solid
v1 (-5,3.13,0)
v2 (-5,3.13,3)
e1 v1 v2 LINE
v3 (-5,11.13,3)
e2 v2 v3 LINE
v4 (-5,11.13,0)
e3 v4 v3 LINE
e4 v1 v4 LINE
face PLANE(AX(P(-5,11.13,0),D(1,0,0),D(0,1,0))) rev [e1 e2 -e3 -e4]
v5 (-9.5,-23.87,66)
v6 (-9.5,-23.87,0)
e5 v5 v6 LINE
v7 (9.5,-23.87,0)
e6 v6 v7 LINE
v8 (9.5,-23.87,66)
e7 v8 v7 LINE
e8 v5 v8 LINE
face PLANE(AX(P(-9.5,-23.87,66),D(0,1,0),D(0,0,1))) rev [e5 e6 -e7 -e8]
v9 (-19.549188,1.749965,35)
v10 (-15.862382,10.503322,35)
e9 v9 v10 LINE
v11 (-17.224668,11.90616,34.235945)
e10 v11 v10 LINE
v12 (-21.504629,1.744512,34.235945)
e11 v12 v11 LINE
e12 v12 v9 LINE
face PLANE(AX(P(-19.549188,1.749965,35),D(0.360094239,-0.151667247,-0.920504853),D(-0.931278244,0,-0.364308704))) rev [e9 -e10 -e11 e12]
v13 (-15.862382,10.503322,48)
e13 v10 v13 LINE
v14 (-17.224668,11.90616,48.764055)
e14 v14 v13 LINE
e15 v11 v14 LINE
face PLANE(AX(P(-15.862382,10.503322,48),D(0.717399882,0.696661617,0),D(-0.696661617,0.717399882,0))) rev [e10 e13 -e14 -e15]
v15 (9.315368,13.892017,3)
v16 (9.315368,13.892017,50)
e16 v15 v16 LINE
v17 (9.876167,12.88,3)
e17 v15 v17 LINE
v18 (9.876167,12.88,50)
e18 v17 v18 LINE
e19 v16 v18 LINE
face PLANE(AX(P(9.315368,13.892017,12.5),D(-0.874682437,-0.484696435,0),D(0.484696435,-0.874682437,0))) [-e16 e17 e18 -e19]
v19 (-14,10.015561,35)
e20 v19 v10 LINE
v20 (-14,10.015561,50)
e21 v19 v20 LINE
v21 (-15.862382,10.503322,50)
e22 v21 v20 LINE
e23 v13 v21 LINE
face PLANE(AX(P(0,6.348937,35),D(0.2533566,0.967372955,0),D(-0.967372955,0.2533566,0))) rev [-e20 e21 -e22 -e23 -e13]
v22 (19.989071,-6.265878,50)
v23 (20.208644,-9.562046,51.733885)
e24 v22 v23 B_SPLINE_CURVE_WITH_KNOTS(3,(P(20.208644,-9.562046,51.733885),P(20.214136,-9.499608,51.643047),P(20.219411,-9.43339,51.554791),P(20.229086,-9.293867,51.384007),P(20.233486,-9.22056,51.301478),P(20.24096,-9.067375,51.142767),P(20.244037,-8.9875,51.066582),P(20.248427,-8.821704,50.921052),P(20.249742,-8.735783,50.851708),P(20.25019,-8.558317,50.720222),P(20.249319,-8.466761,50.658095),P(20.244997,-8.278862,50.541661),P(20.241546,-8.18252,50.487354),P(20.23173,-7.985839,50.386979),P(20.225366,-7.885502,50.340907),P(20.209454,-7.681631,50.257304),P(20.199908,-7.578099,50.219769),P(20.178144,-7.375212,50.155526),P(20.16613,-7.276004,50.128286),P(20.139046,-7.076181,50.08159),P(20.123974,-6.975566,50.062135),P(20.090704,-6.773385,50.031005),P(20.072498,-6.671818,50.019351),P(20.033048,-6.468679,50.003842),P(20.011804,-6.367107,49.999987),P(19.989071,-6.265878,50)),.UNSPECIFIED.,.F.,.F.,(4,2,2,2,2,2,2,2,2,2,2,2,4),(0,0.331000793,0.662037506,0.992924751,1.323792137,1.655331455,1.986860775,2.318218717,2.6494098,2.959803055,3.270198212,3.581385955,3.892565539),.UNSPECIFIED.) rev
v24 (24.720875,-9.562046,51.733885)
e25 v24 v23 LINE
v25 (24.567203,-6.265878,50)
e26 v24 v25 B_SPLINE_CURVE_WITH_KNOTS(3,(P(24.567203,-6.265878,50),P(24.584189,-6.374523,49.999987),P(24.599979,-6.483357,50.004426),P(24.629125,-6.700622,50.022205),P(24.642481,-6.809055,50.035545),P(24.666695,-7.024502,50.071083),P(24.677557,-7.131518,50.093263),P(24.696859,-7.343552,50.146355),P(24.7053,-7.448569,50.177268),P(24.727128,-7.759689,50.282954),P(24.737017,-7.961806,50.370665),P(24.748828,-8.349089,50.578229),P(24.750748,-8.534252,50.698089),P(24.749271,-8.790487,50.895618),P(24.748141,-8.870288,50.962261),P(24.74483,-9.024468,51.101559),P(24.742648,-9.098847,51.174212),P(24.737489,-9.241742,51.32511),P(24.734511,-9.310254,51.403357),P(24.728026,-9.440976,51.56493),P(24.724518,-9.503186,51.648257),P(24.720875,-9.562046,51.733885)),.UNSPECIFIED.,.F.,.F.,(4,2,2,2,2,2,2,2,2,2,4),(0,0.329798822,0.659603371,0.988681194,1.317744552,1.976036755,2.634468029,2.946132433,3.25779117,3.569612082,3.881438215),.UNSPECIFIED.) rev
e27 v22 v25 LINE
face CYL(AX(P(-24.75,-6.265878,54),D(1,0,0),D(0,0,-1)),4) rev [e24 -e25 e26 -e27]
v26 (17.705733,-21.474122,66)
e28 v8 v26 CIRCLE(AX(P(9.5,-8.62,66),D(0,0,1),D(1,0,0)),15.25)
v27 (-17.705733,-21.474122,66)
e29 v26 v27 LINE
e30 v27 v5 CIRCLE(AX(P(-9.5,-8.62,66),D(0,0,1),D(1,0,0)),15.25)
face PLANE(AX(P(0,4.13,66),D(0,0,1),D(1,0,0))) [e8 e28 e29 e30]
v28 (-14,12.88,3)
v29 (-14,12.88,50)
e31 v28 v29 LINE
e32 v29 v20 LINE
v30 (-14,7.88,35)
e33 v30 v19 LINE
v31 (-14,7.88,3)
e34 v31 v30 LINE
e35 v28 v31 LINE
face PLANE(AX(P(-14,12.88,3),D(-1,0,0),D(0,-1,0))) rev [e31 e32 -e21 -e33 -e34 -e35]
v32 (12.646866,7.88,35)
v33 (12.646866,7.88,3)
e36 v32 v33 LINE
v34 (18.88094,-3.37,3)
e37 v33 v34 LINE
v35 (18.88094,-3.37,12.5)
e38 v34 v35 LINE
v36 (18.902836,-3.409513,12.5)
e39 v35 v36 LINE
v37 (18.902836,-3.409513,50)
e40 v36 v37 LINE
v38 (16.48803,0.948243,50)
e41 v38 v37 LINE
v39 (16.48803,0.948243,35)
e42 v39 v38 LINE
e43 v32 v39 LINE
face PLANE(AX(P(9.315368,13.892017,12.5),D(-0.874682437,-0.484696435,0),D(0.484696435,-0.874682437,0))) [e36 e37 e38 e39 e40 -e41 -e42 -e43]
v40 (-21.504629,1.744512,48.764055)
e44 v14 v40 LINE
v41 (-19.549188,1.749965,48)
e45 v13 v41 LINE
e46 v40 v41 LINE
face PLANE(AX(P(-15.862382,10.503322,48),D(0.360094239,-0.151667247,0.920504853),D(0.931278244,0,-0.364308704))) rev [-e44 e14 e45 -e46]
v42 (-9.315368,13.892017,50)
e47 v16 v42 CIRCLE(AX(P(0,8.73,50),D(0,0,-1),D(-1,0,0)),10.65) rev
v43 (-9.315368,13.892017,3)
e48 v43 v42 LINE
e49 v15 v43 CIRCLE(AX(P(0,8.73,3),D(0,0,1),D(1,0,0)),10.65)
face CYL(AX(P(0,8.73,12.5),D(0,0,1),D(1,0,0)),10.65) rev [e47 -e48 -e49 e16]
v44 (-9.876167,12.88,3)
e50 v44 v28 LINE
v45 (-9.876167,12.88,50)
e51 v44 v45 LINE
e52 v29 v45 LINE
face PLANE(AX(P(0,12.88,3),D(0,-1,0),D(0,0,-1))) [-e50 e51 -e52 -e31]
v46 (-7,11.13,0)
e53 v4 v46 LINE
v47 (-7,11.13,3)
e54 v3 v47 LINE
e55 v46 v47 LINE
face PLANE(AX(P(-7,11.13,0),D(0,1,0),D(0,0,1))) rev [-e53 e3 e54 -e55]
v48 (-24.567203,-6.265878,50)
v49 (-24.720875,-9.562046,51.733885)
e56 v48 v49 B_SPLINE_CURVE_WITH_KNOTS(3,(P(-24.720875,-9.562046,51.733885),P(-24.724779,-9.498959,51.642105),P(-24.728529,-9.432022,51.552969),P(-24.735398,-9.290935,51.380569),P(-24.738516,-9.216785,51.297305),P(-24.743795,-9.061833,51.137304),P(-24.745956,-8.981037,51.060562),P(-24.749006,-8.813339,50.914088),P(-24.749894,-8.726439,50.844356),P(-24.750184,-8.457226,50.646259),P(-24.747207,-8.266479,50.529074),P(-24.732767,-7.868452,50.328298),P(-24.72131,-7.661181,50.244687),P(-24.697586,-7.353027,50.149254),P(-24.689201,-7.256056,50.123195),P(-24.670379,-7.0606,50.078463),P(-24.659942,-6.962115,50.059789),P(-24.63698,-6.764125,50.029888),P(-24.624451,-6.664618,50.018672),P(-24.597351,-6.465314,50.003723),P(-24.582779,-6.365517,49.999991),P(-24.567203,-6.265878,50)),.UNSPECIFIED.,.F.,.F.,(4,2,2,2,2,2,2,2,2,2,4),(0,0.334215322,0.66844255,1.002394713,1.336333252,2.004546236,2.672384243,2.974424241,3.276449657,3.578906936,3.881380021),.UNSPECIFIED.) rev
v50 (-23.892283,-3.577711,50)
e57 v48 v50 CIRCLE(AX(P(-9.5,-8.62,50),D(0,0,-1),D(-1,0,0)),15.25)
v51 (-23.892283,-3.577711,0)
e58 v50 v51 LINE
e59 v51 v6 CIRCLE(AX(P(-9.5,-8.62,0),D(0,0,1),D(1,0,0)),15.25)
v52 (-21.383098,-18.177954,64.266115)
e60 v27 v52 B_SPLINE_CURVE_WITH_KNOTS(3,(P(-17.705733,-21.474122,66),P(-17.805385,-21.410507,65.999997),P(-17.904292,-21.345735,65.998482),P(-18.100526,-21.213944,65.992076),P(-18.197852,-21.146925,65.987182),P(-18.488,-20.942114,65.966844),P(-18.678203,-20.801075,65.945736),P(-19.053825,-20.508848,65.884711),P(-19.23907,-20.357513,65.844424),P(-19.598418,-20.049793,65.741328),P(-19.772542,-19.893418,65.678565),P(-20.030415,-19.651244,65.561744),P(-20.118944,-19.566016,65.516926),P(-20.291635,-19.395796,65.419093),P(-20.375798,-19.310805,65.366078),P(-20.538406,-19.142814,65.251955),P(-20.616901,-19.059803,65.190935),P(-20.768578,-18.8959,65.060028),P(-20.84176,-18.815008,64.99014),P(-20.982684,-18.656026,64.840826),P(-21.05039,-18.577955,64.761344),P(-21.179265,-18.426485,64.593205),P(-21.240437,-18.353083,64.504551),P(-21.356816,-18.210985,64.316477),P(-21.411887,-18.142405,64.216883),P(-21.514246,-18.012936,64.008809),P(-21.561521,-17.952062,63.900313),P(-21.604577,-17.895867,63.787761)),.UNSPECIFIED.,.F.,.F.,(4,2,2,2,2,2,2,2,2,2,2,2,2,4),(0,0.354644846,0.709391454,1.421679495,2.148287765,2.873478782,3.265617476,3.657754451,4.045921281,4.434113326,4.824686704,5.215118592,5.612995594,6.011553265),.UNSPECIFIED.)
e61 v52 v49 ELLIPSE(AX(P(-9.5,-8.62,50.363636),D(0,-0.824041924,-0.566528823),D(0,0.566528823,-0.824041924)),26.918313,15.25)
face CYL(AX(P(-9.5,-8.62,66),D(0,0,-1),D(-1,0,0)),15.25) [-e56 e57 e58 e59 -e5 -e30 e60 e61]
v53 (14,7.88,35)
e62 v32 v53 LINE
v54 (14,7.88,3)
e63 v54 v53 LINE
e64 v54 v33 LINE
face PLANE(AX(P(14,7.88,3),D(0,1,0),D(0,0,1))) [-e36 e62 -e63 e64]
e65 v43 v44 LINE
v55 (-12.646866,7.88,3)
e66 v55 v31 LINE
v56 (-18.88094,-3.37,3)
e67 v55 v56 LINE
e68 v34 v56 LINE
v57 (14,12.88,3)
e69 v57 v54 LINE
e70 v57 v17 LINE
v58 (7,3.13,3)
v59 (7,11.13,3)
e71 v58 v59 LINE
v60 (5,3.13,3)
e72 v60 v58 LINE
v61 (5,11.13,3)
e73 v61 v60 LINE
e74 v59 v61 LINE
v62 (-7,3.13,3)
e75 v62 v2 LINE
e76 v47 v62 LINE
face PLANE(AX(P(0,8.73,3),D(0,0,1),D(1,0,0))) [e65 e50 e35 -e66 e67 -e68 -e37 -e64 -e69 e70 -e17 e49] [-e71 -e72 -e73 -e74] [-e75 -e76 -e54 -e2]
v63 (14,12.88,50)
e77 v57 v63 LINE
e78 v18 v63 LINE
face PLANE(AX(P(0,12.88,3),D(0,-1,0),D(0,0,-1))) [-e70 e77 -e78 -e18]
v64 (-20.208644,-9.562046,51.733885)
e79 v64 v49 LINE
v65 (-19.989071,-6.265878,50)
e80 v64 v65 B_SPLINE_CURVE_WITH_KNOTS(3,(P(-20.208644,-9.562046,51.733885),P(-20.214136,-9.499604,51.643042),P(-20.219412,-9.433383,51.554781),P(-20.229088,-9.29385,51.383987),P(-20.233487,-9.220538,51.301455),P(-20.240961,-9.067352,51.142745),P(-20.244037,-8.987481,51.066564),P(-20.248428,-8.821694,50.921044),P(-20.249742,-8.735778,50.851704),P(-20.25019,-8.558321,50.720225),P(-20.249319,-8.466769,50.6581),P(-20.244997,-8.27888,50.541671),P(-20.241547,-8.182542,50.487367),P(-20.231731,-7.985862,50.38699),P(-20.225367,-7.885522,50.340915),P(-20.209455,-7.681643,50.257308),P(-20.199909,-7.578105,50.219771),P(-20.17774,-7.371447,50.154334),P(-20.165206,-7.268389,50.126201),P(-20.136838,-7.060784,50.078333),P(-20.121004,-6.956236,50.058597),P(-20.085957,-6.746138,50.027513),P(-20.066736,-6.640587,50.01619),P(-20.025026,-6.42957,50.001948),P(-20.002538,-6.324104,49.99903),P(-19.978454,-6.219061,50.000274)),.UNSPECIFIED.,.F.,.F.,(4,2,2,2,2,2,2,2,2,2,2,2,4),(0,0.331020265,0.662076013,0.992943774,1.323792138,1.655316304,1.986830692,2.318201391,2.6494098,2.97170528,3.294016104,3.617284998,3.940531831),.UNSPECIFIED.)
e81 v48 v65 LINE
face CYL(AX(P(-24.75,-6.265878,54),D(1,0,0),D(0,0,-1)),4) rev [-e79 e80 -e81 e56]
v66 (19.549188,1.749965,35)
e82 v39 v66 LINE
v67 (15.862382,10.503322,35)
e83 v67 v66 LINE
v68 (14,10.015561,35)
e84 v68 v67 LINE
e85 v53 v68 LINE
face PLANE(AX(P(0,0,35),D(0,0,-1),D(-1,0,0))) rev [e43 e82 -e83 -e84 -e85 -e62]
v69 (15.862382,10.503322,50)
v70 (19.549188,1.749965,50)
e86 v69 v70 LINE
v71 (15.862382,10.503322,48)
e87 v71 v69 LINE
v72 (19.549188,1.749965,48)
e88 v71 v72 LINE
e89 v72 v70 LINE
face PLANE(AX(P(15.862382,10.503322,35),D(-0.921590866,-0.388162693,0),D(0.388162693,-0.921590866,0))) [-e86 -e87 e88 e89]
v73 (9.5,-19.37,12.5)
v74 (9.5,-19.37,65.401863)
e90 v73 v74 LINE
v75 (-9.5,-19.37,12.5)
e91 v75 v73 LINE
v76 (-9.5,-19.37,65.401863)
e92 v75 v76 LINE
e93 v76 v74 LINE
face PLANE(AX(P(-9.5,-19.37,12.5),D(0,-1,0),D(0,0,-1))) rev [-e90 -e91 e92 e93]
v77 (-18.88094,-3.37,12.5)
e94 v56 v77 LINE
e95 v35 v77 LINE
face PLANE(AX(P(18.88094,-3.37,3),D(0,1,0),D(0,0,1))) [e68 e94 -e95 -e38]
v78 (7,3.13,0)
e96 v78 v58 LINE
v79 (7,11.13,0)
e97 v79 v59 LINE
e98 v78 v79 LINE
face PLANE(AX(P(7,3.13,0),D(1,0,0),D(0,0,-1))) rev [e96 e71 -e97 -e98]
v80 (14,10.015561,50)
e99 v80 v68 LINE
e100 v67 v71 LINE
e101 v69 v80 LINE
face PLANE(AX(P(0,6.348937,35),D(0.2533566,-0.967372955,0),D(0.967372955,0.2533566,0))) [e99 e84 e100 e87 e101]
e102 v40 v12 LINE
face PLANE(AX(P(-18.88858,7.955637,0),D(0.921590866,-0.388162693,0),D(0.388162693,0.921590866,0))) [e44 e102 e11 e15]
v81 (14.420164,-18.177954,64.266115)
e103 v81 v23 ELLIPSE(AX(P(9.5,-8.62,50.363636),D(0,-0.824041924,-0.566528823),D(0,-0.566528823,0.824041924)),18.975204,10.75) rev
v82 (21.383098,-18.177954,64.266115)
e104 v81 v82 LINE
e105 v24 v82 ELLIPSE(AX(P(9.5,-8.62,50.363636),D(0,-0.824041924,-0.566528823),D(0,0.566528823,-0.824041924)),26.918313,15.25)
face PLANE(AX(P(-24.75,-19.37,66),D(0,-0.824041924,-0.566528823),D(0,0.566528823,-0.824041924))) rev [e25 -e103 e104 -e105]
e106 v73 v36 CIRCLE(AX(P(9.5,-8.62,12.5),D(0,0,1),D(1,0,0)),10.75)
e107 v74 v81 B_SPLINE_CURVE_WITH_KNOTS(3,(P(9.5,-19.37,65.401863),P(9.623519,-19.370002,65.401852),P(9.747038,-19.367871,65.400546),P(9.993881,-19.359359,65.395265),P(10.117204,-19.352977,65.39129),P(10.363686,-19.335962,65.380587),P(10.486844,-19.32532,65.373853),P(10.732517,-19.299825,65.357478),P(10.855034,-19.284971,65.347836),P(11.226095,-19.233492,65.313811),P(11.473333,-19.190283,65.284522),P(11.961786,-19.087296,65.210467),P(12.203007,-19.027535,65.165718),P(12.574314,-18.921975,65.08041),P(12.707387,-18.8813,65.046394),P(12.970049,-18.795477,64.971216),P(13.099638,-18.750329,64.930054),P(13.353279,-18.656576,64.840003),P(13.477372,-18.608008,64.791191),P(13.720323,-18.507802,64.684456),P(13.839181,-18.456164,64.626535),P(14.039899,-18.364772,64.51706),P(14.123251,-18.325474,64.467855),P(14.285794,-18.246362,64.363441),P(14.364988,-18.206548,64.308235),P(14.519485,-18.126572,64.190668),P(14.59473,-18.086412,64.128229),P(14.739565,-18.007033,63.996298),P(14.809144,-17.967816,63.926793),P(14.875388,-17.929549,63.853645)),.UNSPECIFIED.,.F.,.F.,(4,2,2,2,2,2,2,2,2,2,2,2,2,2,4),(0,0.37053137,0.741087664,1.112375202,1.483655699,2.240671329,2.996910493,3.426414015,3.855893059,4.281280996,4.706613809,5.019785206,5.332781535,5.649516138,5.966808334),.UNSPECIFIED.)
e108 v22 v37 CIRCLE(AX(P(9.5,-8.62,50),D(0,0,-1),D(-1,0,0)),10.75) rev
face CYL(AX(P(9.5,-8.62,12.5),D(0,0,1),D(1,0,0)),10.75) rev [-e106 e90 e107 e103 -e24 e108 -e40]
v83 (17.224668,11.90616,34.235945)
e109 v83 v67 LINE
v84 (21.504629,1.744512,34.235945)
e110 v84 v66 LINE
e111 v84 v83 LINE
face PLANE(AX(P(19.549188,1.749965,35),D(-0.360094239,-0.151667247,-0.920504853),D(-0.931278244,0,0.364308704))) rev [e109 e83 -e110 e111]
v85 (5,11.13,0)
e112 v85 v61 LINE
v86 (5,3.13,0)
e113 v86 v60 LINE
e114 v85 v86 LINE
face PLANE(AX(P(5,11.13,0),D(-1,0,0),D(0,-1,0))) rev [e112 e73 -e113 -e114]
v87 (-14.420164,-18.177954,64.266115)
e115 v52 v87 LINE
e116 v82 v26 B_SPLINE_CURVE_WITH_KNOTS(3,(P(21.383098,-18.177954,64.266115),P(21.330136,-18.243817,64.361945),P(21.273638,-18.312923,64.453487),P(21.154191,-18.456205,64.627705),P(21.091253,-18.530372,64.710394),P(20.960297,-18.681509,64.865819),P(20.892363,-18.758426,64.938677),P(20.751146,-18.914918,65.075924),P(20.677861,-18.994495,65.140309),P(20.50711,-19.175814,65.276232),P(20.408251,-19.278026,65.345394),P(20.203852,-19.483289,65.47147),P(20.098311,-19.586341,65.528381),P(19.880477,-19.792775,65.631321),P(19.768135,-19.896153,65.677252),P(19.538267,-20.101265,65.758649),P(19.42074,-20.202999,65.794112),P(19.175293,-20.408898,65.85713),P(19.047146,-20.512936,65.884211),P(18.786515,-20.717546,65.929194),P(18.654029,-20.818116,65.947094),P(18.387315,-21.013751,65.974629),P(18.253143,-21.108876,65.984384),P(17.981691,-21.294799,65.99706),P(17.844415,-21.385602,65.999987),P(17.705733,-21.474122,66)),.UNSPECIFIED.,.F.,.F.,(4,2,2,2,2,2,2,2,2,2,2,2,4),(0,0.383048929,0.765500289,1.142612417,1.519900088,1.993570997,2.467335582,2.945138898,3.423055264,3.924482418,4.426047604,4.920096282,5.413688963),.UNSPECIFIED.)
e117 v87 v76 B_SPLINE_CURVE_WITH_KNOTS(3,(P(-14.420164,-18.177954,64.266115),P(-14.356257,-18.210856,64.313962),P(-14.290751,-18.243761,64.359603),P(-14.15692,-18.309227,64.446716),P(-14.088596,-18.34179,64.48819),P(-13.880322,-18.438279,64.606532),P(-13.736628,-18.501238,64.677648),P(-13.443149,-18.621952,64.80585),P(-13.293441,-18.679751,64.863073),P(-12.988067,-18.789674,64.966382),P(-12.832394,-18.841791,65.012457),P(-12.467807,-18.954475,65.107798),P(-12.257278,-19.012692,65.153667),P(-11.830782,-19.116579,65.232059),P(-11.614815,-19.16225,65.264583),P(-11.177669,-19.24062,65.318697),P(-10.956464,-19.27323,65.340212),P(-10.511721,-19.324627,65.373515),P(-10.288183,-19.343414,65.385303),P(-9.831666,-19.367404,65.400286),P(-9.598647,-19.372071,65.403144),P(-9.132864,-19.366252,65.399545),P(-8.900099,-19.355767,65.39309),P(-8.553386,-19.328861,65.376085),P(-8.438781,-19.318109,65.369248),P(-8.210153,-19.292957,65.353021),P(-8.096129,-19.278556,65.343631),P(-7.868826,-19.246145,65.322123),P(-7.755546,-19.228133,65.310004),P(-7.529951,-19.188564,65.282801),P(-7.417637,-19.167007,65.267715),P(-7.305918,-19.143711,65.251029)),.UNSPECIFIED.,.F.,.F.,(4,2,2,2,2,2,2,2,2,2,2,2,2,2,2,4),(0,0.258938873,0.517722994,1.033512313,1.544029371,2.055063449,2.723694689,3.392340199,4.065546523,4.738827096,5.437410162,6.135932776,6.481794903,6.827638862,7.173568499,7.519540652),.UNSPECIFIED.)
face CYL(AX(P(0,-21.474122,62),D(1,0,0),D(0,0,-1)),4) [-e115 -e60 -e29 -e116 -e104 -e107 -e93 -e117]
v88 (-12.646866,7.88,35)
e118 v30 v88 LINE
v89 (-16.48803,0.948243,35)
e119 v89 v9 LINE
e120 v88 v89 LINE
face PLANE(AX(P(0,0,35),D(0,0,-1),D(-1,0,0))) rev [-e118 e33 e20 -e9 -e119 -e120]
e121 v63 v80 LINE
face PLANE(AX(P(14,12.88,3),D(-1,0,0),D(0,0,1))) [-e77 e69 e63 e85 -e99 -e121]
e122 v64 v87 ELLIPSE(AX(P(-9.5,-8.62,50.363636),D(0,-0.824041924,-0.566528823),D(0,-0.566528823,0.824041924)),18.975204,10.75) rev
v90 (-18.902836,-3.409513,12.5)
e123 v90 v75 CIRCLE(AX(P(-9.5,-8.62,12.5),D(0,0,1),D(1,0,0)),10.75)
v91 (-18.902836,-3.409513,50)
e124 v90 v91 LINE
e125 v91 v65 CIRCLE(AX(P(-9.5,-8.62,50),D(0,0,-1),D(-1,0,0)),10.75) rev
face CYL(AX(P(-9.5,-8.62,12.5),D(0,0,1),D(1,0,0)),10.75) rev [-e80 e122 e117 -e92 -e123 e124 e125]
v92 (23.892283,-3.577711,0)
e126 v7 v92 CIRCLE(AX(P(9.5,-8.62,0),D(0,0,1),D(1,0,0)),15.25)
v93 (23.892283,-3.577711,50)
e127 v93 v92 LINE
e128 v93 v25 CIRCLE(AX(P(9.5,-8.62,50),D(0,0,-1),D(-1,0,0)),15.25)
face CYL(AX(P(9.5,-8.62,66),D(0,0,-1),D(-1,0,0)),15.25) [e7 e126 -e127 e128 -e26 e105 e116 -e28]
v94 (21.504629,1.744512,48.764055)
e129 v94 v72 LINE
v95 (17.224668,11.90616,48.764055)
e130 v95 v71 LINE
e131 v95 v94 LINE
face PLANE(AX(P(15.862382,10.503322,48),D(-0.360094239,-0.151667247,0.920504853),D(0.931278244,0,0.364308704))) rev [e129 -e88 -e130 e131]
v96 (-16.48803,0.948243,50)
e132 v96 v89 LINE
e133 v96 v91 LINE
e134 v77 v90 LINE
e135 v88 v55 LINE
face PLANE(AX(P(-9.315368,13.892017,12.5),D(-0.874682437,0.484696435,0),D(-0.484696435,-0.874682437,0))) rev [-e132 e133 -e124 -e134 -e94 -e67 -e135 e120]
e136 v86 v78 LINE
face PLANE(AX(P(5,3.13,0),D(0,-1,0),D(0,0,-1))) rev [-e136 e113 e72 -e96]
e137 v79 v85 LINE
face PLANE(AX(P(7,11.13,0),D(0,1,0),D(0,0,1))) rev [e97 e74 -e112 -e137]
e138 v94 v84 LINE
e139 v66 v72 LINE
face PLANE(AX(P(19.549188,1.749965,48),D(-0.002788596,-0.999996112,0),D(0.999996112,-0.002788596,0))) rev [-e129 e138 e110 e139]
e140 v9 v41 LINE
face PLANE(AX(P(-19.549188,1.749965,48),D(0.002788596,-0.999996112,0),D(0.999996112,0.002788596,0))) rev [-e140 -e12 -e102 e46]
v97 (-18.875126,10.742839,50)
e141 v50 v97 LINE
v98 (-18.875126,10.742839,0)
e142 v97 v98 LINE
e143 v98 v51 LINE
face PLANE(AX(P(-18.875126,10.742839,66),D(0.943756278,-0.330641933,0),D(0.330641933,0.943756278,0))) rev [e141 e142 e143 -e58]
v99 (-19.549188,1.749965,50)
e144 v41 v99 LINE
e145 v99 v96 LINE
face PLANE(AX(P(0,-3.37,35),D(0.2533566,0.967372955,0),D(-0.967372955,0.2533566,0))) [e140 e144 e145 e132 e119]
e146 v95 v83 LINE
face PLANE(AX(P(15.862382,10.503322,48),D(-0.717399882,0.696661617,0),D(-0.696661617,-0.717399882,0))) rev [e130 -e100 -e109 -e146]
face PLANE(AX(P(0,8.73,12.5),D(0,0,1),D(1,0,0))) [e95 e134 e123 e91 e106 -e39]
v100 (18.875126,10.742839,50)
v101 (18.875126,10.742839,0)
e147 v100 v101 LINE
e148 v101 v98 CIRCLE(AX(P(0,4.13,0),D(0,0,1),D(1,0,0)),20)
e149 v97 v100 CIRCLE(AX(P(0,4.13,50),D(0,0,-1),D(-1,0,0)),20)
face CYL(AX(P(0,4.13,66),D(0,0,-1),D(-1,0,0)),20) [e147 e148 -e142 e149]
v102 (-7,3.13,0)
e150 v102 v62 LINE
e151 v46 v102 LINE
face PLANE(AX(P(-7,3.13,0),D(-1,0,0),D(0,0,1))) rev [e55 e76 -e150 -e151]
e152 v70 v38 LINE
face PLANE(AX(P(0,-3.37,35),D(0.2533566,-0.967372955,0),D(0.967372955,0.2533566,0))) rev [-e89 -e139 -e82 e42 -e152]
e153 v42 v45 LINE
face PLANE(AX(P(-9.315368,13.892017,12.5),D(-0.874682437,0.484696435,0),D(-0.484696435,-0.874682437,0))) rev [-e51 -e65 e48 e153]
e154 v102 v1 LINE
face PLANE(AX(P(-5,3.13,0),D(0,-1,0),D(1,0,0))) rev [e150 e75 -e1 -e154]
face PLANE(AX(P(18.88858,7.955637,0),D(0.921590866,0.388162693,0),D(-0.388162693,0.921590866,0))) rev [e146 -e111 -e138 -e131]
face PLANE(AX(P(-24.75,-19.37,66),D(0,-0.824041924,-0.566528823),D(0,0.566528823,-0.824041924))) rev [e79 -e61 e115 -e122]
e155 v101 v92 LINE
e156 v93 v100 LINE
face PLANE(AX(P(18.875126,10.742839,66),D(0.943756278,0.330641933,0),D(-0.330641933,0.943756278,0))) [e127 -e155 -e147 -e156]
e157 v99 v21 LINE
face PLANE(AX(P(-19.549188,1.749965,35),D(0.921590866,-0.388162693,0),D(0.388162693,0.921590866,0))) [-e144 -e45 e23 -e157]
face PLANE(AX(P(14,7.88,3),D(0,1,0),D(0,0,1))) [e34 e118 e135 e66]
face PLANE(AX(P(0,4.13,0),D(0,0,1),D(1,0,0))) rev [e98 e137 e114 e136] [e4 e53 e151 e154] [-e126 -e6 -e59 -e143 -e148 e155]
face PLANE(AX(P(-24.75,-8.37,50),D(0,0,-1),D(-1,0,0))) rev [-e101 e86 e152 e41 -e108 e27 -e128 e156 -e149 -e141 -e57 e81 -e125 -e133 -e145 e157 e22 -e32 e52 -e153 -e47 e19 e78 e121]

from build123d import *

# Parameters (mm, degrees)
RESSALTO_EXTRUS_O1_DEPTH   = 66
CORTE_EXTRUS_O1_DEPTH      = 53.5
CORTE_EXTRUS_O2_DEPTH      = 9.5
ESBO_O5_W                  = 2
ESBO_O5_H                  = 8
CORTE_EXTRUS_O3_DEPTH      = 72.859720289
CORTE_EXTRUS_O4_DEPTH      = 75.503821379
CORTE_EXTRUS_O4_DEPTH_BACK = 75.503821379
CORTE_EXTRUS_O6_DEPTH      = 15
ESBO_O10_W                 = 13
ESBO_O10_H                 = 9.498093923
CORTE_EXTRUS_O7_DEPTH      = 1.8
CORTE_EXTRUS_O7_DRAFT      = 23
ESBO_O11_W                 = 13
ESBO_O11_H                 = 9.498093923
CORTE_EXTRUS_O8_DEPTH      = 1.8
CORTE_EXTRUS_O8_DRAFT      = 23
FILETE10_START             = -24.75
FILETE10_DEPTH             = 49.5
FILETE11_R                 = 4
FILETE12_R                 = 4
CORTE_EXTRUS_O9_DEPTH      = 47


with BuildPart() as part:
    # Esboço2 → Ressalto-extrusão1 (new body)
    with BuildSketch(Plane.XY):
        with BuildLine():
            Line((18.875125561, 10.742838653), (23.89228324, -3.577710527))
            ThreePointArc((23.89228324, -3.577710527), (21.938999447, -17.442346217), (9.5, -23.87))
            Line((9.5, -23.87), (-9.5, -23.87))
            ThreePointArc((-9.5, -23.87), (-21.938999447, -17.442346217), (-23.89228324, -3.577710527))
            Line((-23.89228324, -3.577710527), (-18.875125561, 10.742838653))
            ThreePointArc((-18.875125561, 10.742838653), (0, 24.13), (18.875125561, 10.742838653))
        make_face()
    extrude(amount=RESSALTO_EXTRUS_O1_DEPTH)

    # Esboço3 → Corte-extrusão1 (cut)
    with BuildSketch(Plane.XY.offset(66)):
        with BuildLine():
            Line((-9.315367954, 13.892017036), (-18.902836198, -3.409513321))
            ThreePointArc((-18.902836198, -3.409513321), (-18.762160434, -14.076636702), (-9.5, -19.37))
            Line((-9.5, -19.37), (9.5, -19.37))
            ThreePointArc((9.5, -19.37), (18.762160434, -14.076636702), (18.902836198, -3.409513321))
            Line((18.902836198, -3.409513321), (9.315367954, 13.892017036))
            ThreePointArc((9.315367954, 13.892017036), (0, 19.38), (-9.315367954, 13.892017036))
        make_face()
    extrude(amount=-CORTE_EXTRUS_O1_DEPTH, mode=Mode.SUBTRACT)

    # Esboço4 → Corte-extrusão2 (cut)
    with BuildSketch(Plane.XY.offset(12.5)):
        with BuildLine():
            Line((-9.315367954, 13.892017036), (-18.88094029, -3.37))
            Line((-18.88094029, -3.37), (18.88094029, -3.37))
            Line((18.88094029, -3.37), (9.315367954, 13.892017036))
            ThreePointArc((9.315367954, 13.892017036), (0, 19.38), (-9.315367954, 13.892017036))
        make_face()
    extrude(amount=-CORTE_EXTRUS_O2_DEPTH, mode=Mode.SUBTRACT)

    # Esboço5 → Corte-extrusão3 (cut, through all)
    with BuildSketch(Plane.XY.offset(3)):
        with Locations((-6, 7.13)):
            Rectangle(ESBO_O5_W, ESBO_O5_H)
        with Locations((6, 7.13)):
            Rectangle(ESBO_O5_W, ESBO_O5_H)
    extrude(amount=-CORTE_EXTRUS_O3_DEPTH, mode=Mode.SUBTRACT)

    # Esboço6 → Corte-extrusão4 (cut, two sides: drawn at the far end of the back side and taken through both)
    with BuildSketch(Plane(origin=(0, 0, 0), x_dir=(0, 0, -1), z_dir=(1, 0, 0)).offset(-CORTE_EXTRUS_O4_DEPTH_BACK)):
        Polygon((-73.252948894, -8.37), (-72.738467135, 18.869608141), (-69.396784042, 24.687681426), (-65.169347817, 25.830591912), (-50, 27.529066054), (-50, -8.37), (-66, -19.37), (-66, -23.87), (-79.476934269, -23.87), (-79.476934269, -8.37), align=None)
    extrude(amount=CORTE_EXTRUS_O4_DEPTH + CORTE_EXTRUS_O4_DEPTH_BACK, mode=Mode.SUBTRACT)

    # Esboço7 → Corte-extrusão6 (cut)
    with BuildSketch(Plane.XY.offset(50)):
        Polygon((0, -3.37), (19.549187838, 1.7499651), (15.86238212, 10.5033217), (2e-09, 6.348937203), (-15.862382121, 10.5033217), (-19.549187841, 1.7499651), align=None)
    extrude(amount=-CORTE_EXTRUS_O6_DEPTH, mode=Mode.SUBTRACT)


with BuildPart() as corte_extrus_o7_tool:
    # Esboço10 → Corte-extrusão7 (with draft: the straight prism first)
    with BuildSketch(Plane(origin=(17.229716404, 7.256943806, 0), x_dir=(0, 0, 1), z_dir=(-0.9215908655875538, -0.3881626932944273, 0))):
        with Locations((41.5, -1.226466591)):
            Rectangle(ESBO_O10_W, ESBO_O10_H)
    extrude(amount=-CORTE_EXTRUS_O7_DEPTH)
    # Corte-extrusão7: the draft: its side faces are tilted about the plane it starts from
    corte_extrus_o7_sides = [corte_extrus_o7_tool.faces().sort_by_distance(p)[0] for p in [
        (16.691813899, 10.852668124, 41.5),
        (18.535216758, 6.475989824, 35),
        (20.378619617, 2.099311524, 41.5),
        (18.535216758, 6.475989824, 48),
    ]]
    draft(corte_extrus_o7_sides, Plane(origin=(17.229716404, 7.256943806, 0), x_dir=(0, 0, 1), z_dir=(-0.9215908655875538, -0.3881626932944273, 0)), CORTE_EXTRUS_O7_DRAFT)


with BuildPart() as part_1:
    add(part.part)

    # Corte-extrusão7: cut by corte_extrus_o7_tool
    add(corte_extrus_o7_tool.part, mode=Mode.SUBTRACT)


with BuildPart() as corte_extrus_o8_tool:
    # Esboço11 → Corte-extrusão8 (with draft: the straight prism first)
    with BuildSketch(Plane(origin=(-17.229716404, 7.256943809, 0), x_dir=(0, 0, -1), z_dir=(0.9215908655337633, -0.3881626934221387, 0))):
        with Locations((-41.5, -1.226466593)):
            Rectangle(ESBO_O11_W, ESBO_O11_H)
    extrude(amount=-CORTE_EXTRUS_O8_DEPTH)
    # Corte-extrusão8: the draft: its side faces are tilted about the plane it starts from
    corte_extrus_o8_sides = [corte_extrus_o8_tool.faces().sort_by_distance(p)[0] for p in [
        (-18.53521676, 6.475989824, 48),
        (-20.37861962, 2.099311524, 41.5),
        (-18.53521676, 6.475989824, 35),
        (-16.6918139, 10.852668124, 41.5),
    ]]
    draft(corte_extrus_o8_sides, Plane(origin=(-17.229716404, 7.256943809, 0), x_dir=(0, 0, -1), z_dir=(0.9215908655337633, -0.3881626934221387, 0)), CORTE_EXTRUS_O8_DRAFT)


with BuildPart() as part_2:
    add(part_1.part)

    # Corte-extrusão8: cut by corte_extrus_o8_tool
    add(corte_extrus_o8_tool.part, mode=Mode.SUBTRACT)

    # Filete10: read off the stored shape, not the designer's step
    # Filete10 outline → Filete10 (cut)
    with BuildSketch(Plane.YZ.offset(FILETE10_START)):
        with BuildLine():
            ThreePointArc((-21.47412196, 66), (-19.611926245, 65.540088576), (-18.177953073, 64.266113561))
            Line((-18.177953073, 64.266113561), (-19.37, 66))
            Line((-19.37, 66), (-21.47412196, 66))
        make_face()
    extrude(amount=FILETE10_DEPTH, mode=Mode.SUBTRACT)

    # Filete11
    filete11_edges = [part_2.edges().sort_by_distance(p)[0] for p in [
        (-22.497521656, -8.37, 50),
    ]]
    fillet(filete11_edges, radius=FILETE11_R)

    # Filete12
    filete12_edges = [part_2.edges().sort_by_distance(p)[0] for p in [
        (22.497521656, -8.37, 50),
    ]]
    fillet(filete12_edges, radius=FILETE12_R)

    # Esboço12 → Corte-extrusão9 (cut)
    with BuildSketch(Plane.XY.offset(50)):
        Polygon((14, 12.88), (14, 7.88), (-14, 7.88), (-14, 12.88), (0, 12.88), align=None)
    extrude(amount=-CORTE_EXTRUS_O9_DEPTH, mode=Mode.SUBTRACT)


solid = part_2.part
